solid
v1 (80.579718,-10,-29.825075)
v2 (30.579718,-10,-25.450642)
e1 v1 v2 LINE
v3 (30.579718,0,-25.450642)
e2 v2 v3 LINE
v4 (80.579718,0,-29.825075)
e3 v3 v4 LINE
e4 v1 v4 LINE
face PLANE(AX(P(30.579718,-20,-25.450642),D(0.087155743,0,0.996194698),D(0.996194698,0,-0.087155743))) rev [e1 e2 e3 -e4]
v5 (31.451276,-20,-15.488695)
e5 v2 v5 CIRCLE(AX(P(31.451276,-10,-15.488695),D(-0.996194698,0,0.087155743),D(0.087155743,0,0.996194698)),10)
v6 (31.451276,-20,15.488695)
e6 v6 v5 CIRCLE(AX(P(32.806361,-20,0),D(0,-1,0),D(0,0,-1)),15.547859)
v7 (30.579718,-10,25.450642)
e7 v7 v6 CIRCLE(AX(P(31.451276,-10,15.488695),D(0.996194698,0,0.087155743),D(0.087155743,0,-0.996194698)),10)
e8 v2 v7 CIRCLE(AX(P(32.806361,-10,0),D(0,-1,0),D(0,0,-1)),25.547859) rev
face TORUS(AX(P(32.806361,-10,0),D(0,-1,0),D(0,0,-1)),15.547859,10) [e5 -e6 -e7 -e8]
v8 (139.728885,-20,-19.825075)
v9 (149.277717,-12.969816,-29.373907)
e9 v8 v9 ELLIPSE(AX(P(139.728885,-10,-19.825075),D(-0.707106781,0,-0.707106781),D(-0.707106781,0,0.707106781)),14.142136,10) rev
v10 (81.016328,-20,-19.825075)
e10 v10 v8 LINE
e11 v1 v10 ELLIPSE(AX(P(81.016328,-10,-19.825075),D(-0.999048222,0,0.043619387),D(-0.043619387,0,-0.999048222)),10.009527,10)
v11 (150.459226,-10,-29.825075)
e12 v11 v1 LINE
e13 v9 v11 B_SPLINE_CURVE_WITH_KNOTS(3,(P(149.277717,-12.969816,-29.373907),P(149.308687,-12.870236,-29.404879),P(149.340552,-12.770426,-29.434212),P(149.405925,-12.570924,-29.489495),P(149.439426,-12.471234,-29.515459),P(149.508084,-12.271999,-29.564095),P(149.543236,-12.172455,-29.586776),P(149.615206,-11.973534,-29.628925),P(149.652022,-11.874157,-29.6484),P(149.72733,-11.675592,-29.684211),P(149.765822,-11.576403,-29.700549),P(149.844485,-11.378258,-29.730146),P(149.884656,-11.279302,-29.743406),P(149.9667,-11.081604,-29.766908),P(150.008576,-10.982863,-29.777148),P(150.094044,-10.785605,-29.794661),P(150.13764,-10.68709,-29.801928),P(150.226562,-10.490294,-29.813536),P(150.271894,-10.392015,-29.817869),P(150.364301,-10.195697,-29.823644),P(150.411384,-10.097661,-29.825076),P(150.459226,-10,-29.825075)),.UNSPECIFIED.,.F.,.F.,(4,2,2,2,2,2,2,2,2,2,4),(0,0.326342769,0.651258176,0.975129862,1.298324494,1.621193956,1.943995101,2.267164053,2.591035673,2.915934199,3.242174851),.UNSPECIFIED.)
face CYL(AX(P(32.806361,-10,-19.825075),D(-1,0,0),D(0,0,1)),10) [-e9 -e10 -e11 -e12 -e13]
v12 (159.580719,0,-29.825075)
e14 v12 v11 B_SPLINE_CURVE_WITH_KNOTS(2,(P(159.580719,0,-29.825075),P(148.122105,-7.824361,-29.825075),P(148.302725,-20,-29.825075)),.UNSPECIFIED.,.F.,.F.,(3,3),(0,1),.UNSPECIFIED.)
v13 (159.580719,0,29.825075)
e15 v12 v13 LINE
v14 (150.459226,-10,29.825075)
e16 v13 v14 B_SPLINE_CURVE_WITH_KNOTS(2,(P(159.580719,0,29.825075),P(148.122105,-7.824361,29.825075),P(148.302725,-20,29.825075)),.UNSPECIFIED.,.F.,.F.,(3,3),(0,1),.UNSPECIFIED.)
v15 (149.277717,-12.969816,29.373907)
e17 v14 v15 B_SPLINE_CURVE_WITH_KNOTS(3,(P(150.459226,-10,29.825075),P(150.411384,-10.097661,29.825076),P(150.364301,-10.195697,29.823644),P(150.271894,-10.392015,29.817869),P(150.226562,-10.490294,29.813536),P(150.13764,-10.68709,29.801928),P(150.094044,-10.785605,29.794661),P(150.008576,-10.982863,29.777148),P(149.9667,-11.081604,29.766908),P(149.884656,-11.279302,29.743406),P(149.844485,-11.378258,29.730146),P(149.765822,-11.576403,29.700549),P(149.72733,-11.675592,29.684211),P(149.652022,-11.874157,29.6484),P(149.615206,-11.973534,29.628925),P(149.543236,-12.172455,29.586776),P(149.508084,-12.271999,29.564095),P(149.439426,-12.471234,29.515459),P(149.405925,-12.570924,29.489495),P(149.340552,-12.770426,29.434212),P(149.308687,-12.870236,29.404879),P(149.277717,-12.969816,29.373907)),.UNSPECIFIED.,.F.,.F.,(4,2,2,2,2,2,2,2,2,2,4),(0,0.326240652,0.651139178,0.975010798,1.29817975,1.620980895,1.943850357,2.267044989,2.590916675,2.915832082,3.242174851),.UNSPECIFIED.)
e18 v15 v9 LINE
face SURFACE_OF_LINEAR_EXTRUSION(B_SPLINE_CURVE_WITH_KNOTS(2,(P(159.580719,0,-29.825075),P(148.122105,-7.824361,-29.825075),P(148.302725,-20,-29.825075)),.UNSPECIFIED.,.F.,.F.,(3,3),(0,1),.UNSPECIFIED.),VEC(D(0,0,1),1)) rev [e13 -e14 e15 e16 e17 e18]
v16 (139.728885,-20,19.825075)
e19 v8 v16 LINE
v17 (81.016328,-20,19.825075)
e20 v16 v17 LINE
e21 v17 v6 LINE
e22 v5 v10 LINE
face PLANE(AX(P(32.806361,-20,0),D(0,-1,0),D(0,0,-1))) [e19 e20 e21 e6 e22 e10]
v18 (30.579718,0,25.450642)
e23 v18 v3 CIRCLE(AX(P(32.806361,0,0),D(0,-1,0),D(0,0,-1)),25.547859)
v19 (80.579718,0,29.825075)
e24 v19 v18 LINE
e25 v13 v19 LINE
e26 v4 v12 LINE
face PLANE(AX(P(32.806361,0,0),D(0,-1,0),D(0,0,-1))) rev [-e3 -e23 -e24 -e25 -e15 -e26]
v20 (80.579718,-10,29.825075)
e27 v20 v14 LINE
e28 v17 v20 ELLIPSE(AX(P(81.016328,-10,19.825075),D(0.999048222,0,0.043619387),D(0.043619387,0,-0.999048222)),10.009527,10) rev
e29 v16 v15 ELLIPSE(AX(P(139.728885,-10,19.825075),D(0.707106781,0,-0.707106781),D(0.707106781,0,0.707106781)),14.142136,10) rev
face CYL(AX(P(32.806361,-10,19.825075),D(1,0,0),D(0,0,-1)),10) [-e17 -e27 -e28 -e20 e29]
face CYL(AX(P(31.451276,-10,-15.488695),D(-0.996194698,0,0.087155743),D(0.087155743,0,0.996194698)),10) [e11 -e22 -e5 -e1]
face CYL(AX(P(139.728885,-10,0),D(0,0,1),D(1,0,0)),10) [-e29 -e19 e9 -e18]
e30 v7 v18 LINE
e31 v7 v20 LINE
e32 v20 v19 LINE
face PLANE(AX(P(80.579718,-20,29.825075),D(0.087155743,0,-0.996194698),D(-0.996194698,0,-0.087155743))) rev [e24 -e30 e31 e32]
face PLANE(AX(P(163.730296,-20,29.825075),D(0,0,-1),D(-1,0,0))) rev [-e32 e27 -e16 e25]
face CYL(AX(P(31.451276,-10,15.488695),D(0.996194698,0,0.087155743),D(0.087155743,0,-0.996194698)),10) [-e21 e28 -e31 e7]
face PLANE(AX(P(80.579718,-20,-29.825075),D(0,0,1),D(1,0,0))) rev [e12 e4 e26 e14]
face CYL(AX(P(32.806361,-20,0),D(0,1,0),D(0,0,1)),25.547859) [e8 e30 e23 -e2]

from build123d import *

# Parameters (mm, degrees)
EXTRUDE_1_DEPTH          = 20
CUT_EXTRUDE_1_DEPTH      = 168.622030081
CUT_EXTRUDE_1_DEPTH_BACK = 168.622030081
FILLET_1_R               = 10


with BuildPart() as part:
    # 草图3 → 凸台-拉伸1 (new body)
    with BuildSketch(Plane(origin=(0, 0, 0), x_dir=(1, 0, 0), z_dir=(0, 1, 0))):
        with BuildLine():
            Line((163.730296133, -29.825074964), (80.579718414, -29.825074964))
            Line((80.579718414, -29.825074964), (30.579718414, -25.450641788))
            ThreePointArc((30.579718414, -25.450641788), (7.258501946, 0), (30.579718414, 25.450641788))
            Line((30.579718414, 25.450641788), (80.579718414, 29.825074964))
            Line((80.579718414, 29.825074964), (163.730296133, 29.825074964))
            Line((163.730296133, 29.825074964), (163.730296133, -29.825074964))
        make_face()
    extrude(amount=-EXTRUDE_1_DEPTH)

    # 草图4 → 切除-拉伸1 (cut, two sides: drawn at the far end of the back side and taken through both)
    with BuildSketch(Plane.XY.offset(-CUT_EXTRUDE_1_DEPTH_BACK)):
        with BuildLine():
            Line((163.730296133, 0), (159.58071917, 0))
            add(Edge.make_bspline(
                [(159.58071917, 0), (148.122104631, -7.824360885), (148.302724928, -20)],
                knots=[0, 0, 0, 1, 1, 1], degree=2))
            Line((148.302724928, -20), (203.221653408, -20))
            Line((203.221653408, -20), (203.221653408, 0))
            Line((203.221653408, 0), (163.730296133, 0))
        make_face()
    extrude(amount=CUT_EXTRUDE_1_DEPTH + CUT_EXTRUDE_1_DEPTH_BACK, mode=Mode.SUBTRACT)

    # 圆角1
    # the kernel refuses this fillet: 10 mm, written as the material it takes off along each edge
    with BuildSketch(Plane(origin=(55.579718414, -20, -29.825074964), x_dir=(0, 0, 1), z_dir=(1, 0, 0))) as fillet_1_piece_1_section:
        with BuildLine():
            CenterArc((FILLET_1_R, -FILLET_1_R), FILLET_1_R, 90, 90)
            Line((0, -FILLET_1_R), (-FILLET_1_R * 0.02, -FILLET_1_R))
            Line((-FILLET_1_R * 0.02, -FILLET_1_R), (-FILLET_1_R * 0.02, FILLET_1_R * 0.02))
            Line((-FILLET_1_R * 0.02, FILLET_1_R * 0.02), (FILLET_1_R, FILLET_1_R * 0.02))
            Line((FILLET_1_R, FILLET_1_R * 0.02), (FILLET_1_R, 0))
        make_face()
    fillet_1_piece_1 = extrude(amount=117.723006514, mode=Mode.PRIVATE)
    fillet_1_piece_1 = split(fillet_1_piece_1, bisect_by=Plane(origin=(118.163125223, -17.857550266, -33.113196996), z_dir=(0.08715574274764791, 0, 0.9961946980917464)), keep=Keep.TOP, mode=Mode.PRIVATE)
    add(fillet_1_piece_1, mode=Mode.SUBTRACT)
    with BuildSketch(Plane(origin=(173.302724928, -20, 29.825074964), x_dir=(0, 1, 0), z_dir=(-1, 0, 0))) as fillet_1_piece_2_section:
        with BuildLine():
            CenterArc((FILLET_1_R, FILLET_1_R), FILLET_1_R, 180, 90)
            Line((0, FILLET_1_R), (-FILLET_1_R * 0.02, FILLET_1_R))
            Line((-FILLET_1_R * 0.02, FILLET_1_R), (-FILLET_1_R * 0.02, -FILLET_1_R * 0.02))
            Line((-FILLET_1_R * 0.02, -FILLET_1_R * 0.02), (FILLET_1_R, -FILLET_1_R * 0.02))
            Line((FILLET_1_R, -FILLET_1_R * 0.02), (FILLET_1_R, 0))
        make_face()
    fillet_1_piece_2 = extrude(amount=117.723006514, mode=Mode.PRIVATE)
    fillet_1_piece_2 = split(fillet_1_piece_2, bisect_by=Plane(origin=(118.163125223, -17.857550266, 33.113196996), z_dir=(0.08715574274764758, 0, -0.9961946980917465)), keep=Keep.TOP, mode=Mode.PRIVATE)
    add(fillet_1_piece_2, mode=Mode.SUBTRACT)
    with BuildSketch(Plane(origin=(105.484585867, -20, 32.003968533), x_dir=(0, 1, 0), z_dir=(-0.9961946980917465, 0, -0.08715574274764758))) as fillet_1_piece_3_section:
        with BuildLine():
            CenterArc((FILLET_1_R, FILLET_1_R), FILLET_1_R, 180, 90)
            Line((0, FILLET_1_R), (-FILLET_1_R * 0.02, FILLET_1_R))
            Line((-FILLET_1_R * 0.02, FILLET_1_R), (-FILLET_1_R * 0.02, -FILLET_1_R * 0.02))
            Line((-FILLET_1_R * 0.02, -FILLET_1_R * 0.02), (FILLET_1_R, -FILLET_1_R * 0.02))
            Line((FILLET_1_R, -FILLET_1_R * 0.02), (FILLET_1_R, 0))
        make_face()
    fillet_1_piece_3 = extrude(amount=75.190991877, mode=Mode.PRIVATE)
    fillet_1_piece_3 = split(fillet_1_piece_3, bisect_by=Plane(origin=(64.333848785, -17.936020538, 29.825074964), z_dir=(0, 0, -1)), keep=Keep.TOP, mode=Mode.PRIVATE)
    add(fillet_1_piece_3, mode=Mode.SUBTRACT)
    with BuildSketch(Plane(origin=(148.302724928, -20, 0), x_dir=(-1, 0, 0), z_dir=(0, 0, -1))) as fillet_1_piece_4:
        with BuildLine():
            CenterArc((8.573839583, 10), FILLET_1_R, 197.276402176, 72.723597824)
            Line((-0.974992369, 7.030183787), (-1.165969008, 6.970787462))
            ThreePointArc((-1.165969008, 6.970787462), (-0.405650645, 3.526203376), (-0.199977997, 0.002966586))
            Line((-0.199977997, 0.002966586), (0, -0.2))
            Line((0, -0.2), (8.573839583, -0.2))
            Line((8.573839583, -0.2), (8.573839583, 0))
        make_face()
    extrude(amount=29.825074964, mode=Mode.SUBTRACT)
    with BuildSketch(Plane(origin=(32.80636105, -20, 0), x_dir=(-0.08715574274764748, 0, 0.9961946980917464), z_dir=(0.9961946980917464, 0, 0.08715574274764748))) as fillet_1_piece_5:
        with BuildLine():
            CenterArc((25.547859105 - FILLET_1_R, -FILLET_1_R), FILLET_1_R, 0, 90)
            Line((25.547859105, -FILLET_1_R), (25.547859105 + FILLET_1_R * 0.02, -FILLET_1_R))
            Line((25.547859105 + FILLET_1_R * 0.02, -FILLET_1_R), (25.547859105 + FILLET_1_R * 0.02, FILLET_1_R * 0.02))
            Line((25.547859105 + FILLET_1_R * 0.02, FILLET_1_R * 0.02), (25.547859105 - FILLET_1_R, FILLET_1_R * 0.02))
            Line((25.547859105 - FILLET_1_R, FILLET_1_R * 0.02), (25.547859105 - FILLET_1_R, 0))
        make_face()
    revolve(axis=Axis((32.80636105, -20, 0), (0, -1, 0)), revolution_arc=170, mode=Mode.SUBTRACT)
    with BuildSketch(Plane(origin=(30.579718414, -20, -25.450641788), x_dir=(0.0871557427476479, 0, 0.9961946980917464), z_dir=(0.9961946980917464, 0, -0.08715574274764791))) as fillet_1_piece_6_section:
        with BuildLine():
            CenterArc((FILLET_1_R, -FILLET_1_R), FILLET_1_R, 90, 90)
            Line((0, -FILLET_1_R), (-FILLET_1_R * 0.02, -FILLET_1_R))
            Line((-FILLET_1_R * 0.02, -FILLET_1_R), (-FILLET_1_R * 0.02, FILLET_1_R * 0.02))
            Line((-FILLET_1_R * 0.02, FILLET_1_R * 0.02), (FILLET_1_R, FILLET_1_R * 0.02))
            Line((FILLET_1_R, FILLET_1_R * 0.02), (FILLET_1_R, 0))
        make_face()
    fillet_1_piece_6 = extrude(amount=75.190991877, mode=Mode.PRIVATE)
    fillet_1_piece_6 = split(fillet_1_piece_6, bisect_by=Plane(origin=(64.333848785, -17.936020538, -29.825074964), z_dir=(0, 0, 1)), keep=Keep.TOP, mode=Mode.PRIVATE)
    add(fillet_1_piece_6, mode=Mode.SUBTRACT)
    with BuildSketch(Plane(origin=(148.302724928, -20, 0), x_dir=(-1, 0, 0), z_dir=(0, 0, 1))) as fillet_1_piece_7:
        with BuildLine():
            CenterArc((8.573839583, -10), FILLET_1_R, 90, 72.723597824)
            Line((-0.974992369, -7.030183787), (-1.165969008, -6.970787462))
            ThreePointArc((-1.165969008, -6.970787462), (-0.405650645, -3.526203376), (-0.199977997, -0.002966586))
            Line((-0.199977997, -0.002966586), (0, 0.2))
            Line((0, 0.2), (8.573839583, 0.2))
            Line((8.573839583, 0.2), (8.573839583, 0))
        make_face()
    extrude(amount=29.825074964, mode=Mode.SUBTRACT)
    with BuildSketch(Plane(origin=(55.579718414, -20, -29.825074964), x_dir=(0, 0, 1), z_dir=(1, 0, 0))) as fillet_1_piece_8a_section:
        with BuildLine():
            CenterArc((FILLET_1_R, -FILLET_1_R), FILLET_1_R, 90, 90)
            Line((0, -FILLET_1_R), (-FILLET_1_R * 0.02, -FILLET_1_R))
            Line((-FILLET_1_R * 0.02, -FILLET_1_R), (-FILLET_1_R * 0.02, FILLET_1_R * 0.02))
            Line((-FILLET_1_R * 0.02, FILLET_1_R * 0.02), (FILLET_1_R, FILLET_1_R * 0.02))
            Line((FILLET_1_R, FILLET_1_R * 0.02), (FILLET_1_R, 0))
        make_face()
    fillet_1_piece_8a = extrude(amount=117.723006514, mode=Mode.PRIVATE)
    fillet_1_piece_8a = split(fillet_1_piece_8a, bisect_by=Plane(origin=(65.506587176, -16.325384108, -28.506346857), z_dir=(-0.08715574274764791, 0, -0.9961946980917464)), keep=Keep.TOP, mode=Mode.PRIVATE)
    with BuildSketch(Plane(origin=(30.579718414, -20, -25.450641788), x_dir=(0.0871557427476479, 0, 0.9961946980917464), z_dir=(0.9961946980917464, 0, -0.08715574274764791))) as fillet_1_piece_8b_section:
        with BuildLine():
            CenterArc((FILLET_1_R, -FILLET_1_R), FILLET_1_R, 90, 90)
            Line((0, -FILLET_1_R), (-FILLET_1_R * 0.02, -FILLET_1_R))
            Line((-FILLET_1_R * 0.02, -FILLET_1_R), (-FILLET_1_R * 0.02, FILLET_1_R * 0.02))
            Line((-FILLET_1_R * 0.02, FILLET_1_R * 0.02), (FILLET_1_R, FILLET_1_R * 0.02))
            Line((FILLET_1_R, FILLET_1_R * 0.02), (FILLET_1_R, 0))
        make_face()
    fillet_1_piece_8b = extrude(amount=75.190991877, mode=Mode.PRIVATE)
    fillet_1_piece_8b = split(fillet_1_piece_8b, bisect_by=Plane(origin=(95.710426565, -16.325384108, -29.825074964), z_dir=(0, 0, -1)), keep=Keep.TOP, mode=Mode.PRIVATE)
    fillet_1_piece_8 = fillet_1_piece_8a & fillet_1_piece_8b
    add(fillet_1_piece_8, mode=Mode.SUBTRACT)
    with BuildSketch(Plane(origin=(173.302724928, -20, 29.825074964), x_dir=(0, 1, 0), z_dir=(-1, 0, 0))) as fillet_1_piece_9a_section:
        with BuildLine():
            CenterArc((FILLET_1_R, FILLET_1_R), FILLET_1_R, 180, 90)
            Line((0, FILLET_1_R), (-FILLET_1_R * 0.02, FILLET_1_R))
            Line((-FILLET_1_R * 0.02, FILLET_1_R), (-FILLET_1_R * 0.02, -FILLET_1_R * 0.02))
            Line((-FILLET_1_R * 0.02, -FILLET_1_R * 0.02), (FILLET_1_R, -FILLET_1_R * 0.02))
            Line((FILLET_1_R, -FILLET_1_R * 0.02), (FILLET_1_R, 0))
        make_face()
    fillet_1_piece_9a = extrude(amount=117.723006514, mode=Mode.PRIVATE)
    fillet_1_piece_9a = split(fillet_1_piece_9a, bisect_by=Plane(origin=(65.506587176, -16.325384108, 28.506346857), z_dir=(-0.08715574274764758, 0, 0.9961946980917465)), keep=Keep.TOP, mode=Mode.PRIVATE)
    with BuildSketch(Plane(origin=(105.484585867, -20, 32.003968533), x_dir=(0, 1, 0), z_dir=(-0.9961946980917465, 0, -0.08715574274764758))) as fillet_1_piece_9b_section:
        with BuildLine():
            CenterArc((FILLET_1_R, FILLET_1_R), FILLET_1_R, 180, 90)
            Line((0, FILLET_1_R), (-FILLET_1_R * 0.02, FILLET_1_R))
            Line((-FILLET_1_R * 0.02, FILLET_1_R), (-FILLET_1_R * 0.02, -FILLET_1_R * 0.02))
            Line((-FILLET_1_R * 0.02, -FILLET_1_R * 0.02), (FILLET_1_R, -FILLET_1_R * 0.02))
            Line((FILLET_1_R, -FILLET_1_R * 0.02), (FILLET_1_R, 0))
        make_face()
    fillet_1_piece_9b = extrude(amount=75.190991877, mode=Mode.PRIVATE)
    fillet_1_piece_9b = split(fillet_1_piece_9b, bisect_by=Plane(origin=(95.710426565, -16.325384108, 29.825074964), z_dir=(0, 0, 1)), keep=Keep.TOP, mode=Mode.PRIVATE)
    fillet_1_piece_9 = fillet_1_piece_9a & fillet_1_piece_9b
    add(fillet_1_piece_9, mode=Mode.SUBTRACT)


solid = part.part
